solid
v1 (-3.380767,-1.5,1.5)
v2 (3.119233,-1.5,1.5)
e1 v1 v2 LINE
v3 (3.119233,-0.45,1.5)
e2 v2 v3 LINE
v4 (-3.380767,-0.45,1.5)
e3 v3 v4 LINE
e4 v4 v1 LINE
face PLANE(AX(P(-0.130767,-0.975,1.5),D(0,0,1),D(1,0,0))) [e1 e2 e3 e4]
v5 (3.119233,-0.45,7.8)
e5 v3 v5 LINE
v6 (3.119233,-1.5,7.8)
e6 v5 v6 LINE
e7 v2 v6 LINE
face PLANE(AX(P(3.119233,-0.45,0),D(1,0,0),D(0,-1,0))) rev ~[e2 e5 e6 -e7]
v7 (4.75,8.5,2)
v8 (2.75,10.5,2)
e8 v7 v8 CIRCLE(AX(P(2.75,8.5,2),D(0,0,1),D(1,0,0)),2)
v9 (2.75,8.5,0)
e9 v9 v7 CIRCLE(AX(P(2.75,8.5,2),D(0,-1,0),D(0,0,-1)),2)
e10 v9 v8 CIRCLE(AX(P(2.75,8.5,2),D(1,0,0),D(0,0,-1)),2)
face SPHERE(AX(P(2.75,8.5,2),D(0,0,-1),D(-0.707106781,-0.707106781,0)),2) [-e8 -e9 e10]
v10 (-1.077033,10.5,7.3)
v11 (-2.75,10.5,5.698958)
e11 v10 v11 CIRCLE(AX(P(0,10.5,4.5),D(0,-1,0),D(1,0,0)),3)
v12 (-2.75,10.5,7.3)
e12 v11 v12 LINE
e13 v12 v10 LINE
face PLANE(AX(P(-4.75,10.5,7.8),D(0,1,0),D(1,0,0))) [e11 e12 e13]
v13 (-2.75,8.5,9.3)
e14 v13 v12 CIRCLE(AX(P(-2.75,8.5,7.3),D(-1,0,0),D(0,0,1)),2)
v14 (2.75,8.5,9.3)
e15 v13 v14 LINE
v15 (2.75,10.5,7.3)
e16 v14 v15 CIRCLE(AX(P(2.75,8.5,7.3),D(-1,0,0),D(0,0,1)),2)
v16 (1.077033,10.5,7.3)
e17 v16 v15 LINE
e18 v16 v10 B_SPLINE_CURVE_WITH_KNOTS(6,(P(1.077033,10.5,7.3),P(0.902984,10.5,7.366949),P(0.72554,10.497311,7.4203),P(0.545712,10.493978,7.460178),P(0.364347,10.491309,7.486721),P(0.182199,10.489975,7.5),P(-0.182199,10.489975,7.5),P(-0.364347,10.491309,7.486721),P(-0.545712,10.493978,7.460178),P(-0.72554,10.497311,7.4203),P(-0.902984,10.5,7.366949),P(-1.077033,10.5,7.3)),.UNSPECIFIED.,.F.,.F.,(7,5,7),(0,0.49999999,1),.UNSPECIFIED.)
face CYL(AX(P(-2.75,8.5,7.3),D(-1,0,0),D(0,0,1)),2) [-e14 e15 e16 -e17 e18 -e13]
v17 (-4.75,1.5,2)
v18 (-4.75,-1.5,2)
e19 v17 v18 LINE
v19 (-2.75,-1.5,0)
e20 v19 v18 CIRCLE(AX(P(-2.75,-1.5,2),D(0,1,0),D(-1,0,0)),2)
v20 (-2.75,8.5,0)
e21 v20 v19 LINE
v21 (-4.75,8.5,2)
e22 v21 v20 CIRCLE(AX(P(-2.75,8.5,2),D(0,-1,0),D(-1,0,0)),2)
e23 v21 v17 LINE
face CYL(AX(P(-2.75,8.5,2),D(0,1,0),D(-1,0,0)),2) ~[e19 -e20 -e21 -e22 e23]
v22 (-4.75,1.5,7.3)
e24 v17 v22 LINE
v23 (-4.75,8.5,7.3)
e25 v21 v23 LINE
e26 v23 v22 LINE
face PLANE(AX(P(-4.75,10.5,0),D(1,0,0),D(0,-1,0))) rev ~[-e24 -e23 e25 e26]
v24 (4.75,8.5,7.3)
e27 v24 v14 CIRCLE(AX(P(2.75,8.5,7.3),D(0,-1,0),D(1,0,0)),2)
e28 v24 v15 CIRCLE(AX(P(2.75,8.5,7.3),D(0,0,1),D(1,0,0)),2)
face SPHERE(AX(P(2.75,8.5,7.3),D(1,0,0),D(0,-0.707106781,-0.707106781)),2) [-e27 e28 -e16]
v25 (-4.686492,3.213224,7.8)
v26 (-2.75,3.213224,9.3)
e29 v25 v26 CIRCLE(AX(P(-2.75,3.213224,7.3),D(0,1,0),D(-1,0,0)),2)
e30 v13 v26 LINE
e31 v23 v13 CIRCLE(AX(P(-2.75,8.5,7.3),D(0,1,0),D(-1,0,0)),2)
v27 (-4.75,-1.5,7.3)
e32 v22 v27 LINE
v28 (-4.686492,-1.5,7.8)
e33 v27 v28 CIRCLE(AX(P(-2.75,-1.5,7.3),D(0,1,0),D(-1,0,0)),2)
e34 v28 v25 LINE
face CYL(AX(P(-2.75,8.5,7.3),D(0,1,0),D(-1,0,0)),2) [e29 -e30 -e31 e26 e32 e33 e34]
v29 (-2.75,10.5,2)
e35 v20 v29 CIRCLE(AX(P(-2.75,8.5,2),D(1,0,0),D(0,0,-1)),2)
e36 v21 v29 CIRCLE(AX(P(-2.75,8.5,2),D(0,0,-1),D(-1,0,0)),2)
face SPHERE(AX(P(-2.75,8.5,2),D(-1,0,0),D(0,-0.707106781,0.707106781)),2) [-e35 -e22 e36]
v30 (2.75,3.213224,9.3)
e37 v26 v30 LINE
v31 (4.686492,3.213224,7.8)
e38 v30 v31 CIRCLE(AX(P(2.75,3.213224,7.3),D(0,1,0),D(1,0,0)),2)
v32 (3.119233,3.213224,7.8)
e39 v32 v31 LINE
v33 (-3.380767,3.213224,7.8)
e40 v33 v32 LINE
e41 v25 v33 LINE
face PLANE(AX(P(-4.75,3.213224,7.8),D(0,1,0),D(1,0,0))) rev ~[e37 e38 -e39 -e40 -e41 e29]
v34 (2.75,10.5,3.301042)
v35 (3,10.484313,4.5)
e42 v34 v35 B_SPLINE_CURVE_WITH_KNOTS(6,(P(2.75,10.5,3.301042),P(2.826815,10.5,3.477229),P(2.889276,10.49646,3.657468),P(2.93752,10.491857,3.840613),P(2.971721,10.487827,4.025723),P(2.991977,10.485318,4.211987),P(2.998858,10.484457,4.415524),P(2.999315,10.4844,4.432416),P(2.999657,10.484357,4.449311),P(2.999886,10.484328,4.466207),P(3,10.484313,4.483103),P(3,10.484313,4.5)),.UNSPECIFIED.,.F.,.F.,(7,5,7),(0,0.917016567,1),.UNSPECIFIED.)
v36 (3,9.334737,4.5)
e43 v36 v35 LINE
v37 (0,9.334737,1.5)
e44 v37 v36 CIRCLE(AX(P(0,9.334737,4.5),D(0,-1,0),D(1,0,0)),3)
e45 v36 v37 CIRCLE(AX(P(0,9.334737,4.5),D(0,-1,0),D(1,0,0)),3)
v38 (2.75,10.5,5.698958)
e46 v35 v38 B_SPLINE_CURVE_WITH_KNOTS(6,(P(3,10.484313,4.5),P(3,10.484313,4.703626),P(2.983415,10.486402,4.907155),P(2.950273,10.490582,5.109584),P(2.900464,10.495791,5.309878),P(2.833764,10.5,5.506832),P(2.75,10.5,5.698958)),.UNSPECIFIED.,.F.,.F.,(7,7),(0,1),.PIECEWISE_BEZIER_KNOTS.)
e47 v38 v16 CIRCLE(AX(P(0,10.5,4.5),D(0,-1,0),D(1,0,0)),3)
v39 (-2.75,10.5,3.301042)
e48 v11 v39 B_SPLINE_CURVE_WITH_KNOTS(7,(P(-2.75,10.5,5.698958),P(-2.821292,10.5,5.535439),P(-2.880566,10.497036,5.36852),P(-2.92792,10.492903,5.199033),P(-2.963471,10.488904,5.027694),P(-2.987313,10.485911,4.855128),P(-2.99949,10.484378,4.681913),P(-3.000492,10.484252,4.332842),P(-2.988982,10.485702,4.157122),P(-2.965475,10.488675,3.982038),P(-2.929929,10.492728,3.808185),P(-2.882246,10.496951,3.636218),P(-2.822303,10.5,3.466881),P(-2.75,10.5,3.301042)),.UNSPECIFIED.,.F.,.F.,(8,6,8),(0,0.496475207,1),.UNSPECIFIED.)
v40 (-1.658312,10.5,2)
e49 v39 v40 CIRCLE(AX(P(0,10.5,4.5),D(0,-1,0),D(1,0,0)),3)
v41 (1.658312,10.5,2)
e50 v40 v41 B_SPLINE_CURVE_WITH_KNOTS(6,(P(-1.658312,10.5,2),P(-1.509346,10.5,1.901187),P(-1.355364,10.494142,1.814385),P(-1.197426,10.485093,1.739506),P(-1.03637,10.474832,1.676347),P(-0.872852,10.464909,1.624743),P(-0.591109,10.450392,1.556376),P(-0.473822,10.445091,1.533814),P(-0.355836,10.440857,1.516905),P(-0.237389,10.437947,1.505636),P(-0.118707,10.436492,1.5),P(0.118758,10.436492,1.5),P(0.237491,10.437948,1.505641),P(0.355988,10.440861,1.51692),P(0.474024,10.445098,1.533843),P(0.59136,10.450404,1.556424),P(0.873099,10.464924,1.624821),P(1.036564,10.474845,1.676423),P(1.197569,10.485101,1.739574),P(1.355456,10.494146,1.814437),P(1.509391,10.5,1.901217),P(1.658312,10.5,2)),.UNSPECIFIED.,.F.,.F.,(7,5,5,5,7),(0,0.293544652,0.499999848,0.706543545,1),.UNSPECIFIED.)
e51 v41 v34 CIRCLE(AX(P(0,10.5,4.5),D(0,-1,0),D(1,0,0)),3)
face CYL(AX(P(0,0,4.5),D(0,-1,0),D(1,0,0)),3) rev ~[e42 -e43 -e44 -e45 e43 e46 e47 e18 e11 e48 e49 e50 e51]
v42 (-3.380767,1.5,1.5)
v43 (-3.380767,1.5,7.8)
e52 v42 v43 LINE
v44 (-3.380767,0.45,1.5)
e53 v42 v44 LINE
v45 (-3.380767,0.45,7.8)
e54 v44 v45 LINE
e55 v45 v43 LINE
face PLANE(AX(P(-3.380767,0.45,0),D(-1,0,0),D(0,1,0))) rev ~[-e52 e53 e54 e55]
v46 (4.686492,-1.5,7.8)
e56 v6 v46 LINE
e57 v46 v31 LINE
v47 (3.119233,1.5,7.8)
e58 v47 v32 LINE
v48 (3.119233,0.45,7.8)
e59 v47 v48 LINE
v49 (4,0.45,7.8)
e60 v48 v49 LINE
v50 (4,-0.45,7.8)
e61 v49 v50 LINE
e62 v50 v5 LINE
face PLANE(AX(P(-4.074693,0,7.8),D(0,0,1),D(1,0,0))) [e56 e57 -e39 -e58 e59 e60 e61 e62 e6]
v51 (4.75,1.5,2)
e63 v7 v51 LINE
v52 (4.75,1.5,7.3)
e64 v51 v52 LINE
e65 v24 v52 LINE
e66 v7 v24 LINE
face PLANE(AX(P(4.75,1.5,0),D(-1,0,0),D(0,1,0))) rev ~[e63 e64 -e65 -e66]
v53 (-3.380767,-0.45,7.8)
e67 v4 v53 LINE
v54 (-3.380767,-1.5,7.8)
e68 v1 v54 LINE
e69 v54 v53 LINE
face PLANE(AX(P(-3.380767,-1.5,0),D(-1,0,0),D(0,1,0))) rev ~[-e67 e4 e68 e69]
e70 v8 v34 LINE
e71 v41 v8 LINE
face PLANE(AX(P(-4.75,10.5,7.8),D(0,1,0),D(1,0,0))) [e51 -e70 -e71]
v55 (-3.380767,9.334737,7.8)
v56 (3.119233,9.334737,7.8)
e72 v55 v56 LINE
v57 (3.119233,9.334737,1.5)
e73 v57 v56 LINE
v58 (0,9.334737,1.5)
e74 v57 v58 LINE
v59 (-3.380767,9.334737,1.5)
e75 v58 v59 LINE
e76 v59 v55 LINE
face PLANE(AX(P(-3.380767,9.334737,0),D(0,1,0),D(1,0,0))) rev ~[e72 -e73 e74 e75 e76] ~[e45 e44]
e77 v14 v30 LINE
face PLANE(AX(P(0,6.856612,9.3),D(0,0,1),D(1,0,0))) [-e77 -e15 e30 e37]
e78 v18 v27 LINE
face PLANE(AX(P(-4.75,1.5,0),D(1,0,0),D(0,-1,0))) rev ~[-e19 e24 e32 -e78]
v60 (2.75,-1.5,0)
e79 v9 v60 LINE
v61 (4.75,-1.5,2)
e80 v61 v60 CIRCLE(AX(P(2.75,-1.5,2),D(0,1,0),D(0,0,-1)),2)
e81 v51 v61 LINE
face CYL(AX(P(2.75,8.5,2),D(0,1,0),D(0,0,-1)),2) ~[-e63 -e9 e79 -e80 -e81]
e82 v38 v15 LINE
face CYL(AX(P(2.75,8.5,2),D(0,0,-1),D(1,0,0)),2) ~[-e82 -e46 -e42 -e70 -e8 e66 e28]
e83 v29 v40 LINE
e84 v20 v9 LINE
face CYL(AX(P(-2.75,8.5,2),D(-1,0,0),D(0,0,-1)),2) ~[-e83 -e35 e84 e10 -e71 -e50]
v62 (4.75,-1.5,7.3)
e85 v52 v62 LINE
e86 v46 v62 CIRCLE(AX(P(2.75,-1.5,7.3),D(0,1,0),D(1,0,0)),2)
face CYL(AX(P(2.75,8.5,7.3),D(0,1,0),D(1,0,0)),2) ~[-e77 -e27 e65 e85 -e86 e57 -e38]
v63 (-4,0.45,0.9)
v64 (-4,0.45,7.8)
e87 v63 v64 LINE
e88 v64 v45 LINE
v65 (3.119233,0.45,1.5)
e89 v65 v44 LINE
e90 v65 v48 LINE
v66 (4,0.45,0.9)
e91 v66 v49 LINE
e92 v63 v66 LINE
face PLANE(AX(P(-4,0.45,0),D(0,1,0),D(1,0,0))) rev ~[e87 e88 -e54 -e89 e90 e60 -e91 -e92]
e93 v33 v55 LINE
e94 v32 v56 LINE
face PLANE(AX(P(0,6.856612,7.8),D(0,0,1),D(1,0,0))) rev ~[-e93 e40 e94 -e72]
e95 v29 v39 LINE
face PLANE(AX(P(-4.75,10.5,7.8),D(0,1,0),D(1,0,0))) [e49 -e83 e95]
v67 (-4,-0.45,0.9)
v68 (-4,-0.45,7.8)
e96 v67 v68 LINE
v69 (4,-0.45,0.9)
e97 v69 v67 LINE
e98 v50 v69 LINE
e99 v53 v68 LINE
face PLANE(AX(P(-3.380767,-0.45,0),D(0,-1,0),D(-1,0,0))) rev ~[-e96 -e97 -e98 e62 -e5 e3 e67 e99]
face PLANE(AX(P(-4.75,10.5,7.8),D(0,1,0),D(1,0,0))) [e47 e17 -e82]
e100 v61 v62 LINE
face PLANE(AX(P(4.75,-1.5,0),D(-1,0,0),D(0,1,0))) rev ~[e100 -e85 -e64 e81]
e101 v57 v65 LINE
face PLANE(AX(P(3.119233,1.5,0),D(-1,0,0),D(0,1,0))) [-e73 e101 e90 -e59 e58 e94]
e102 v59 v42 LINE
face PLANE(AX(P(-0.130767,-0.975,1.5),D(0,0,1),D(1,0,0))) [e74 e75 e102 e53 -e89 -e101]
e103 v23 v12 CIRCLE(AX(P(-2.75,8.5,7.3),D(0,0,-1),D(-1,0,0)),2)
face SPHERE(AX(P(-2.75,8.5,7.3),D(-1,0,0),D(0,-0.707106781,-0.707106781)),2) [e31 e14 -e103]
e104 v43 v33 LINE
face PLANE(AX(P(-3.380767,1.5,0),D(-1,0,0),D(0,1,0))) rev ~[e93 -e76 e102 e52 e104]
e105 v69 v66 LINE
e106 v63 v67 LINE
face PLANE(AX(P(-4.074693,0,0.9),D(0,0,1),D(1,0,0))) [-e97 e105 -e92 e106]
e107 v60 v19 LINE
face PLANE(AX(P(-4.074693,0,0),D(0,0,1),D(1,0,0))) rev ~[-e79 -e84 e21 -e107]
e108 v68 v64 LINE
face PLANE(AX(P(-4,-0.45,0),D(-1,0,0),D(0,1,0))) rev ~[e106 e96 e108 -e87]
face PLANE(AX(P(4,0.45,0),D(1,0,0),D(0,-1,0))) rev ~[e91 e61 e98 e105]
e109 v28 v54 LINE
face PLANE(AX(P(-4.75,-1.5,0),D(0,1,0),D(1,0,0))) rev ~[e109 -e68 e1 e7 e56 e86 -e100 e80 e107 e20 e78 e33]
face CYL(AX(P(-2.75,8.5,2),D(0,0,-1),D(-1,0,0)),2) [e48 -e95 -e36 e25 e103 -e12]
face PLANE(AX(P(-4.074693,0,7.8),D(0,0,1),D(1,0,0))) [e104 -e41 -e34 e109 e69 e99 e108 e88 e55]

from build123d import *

# Parameters (mm, degrees)
F0_W         = 1.3692331631
F0_H         = 7.834737435
F0_W_2       = 6.5
F0_H_2       = 0.9
F0_W_3       = 0.6192331631
F0_H_3       = 1.05
F0_H_4       = 1.165262565
F0_W_4       = 0.8807668369
F0_W_5       = 1.6307668369
F1_DEPTH     = 0.9
F2_DEPTH     = 1.5
F3_DEPTH     = 7.8
F5_W         = 9.5
F5_H         = 7.2867757659
F6_DEPTH     = 1.5
F7_R         = 3
F8_DEPTH     = 10.501
F9_T1_DEPTH  = 5.3
F9_T3_DEPTH  = 5.5
F9_T5_DEPTH  = 10.2867757659
F9_T7_DEPTH  = 15
F9_S11_W     = 2
F9_S11_H     = 2
F9_T12_DEPTH = 2
F9_S17_W     = 2
F9_S17_H     = 2
F9_T18_DEPTH = 2
F9_S23_W     = 2
F9_S23_H     = 2
F9_T24_DEPTH = 2
F9_S29_W     = 2
F9_S29_H     = 2
F9_T30_DEPTH = 2


# Not quite as in the source:
# - a fillet or chamfer that OpenCascade refuses, or shapes differently, is made with other operations: its cross-section is extruded or revolved along the edge and cut away or added
# - a feature names something its author has since deleted; it is built from what else it names


with BuildPart() as f1:
    # F0 (on Top) → F1 (new body)
    with BuildSketch(Plane.XY):
        Polygon((-4.75, 1.5), (-4.75, -1.5), (-3.3807668369, -1.5), (-3.3807668369, -0.45), (-4, -0.45), (-4, 0.45), (-3.3807668369, 0.45), (-3.3807668369, 1.5), align=None)
        Polygon((-3.3807668369, -0.45), (-3.3807668369, -1.5), (-3.1192331631, -1.5), (3.1192331631, -1.5), (3.1192331631, -0.45), align=None)
        with Locations((-4.0653834185, 5.4173687175)):
            Rectangle(F0_W, F0_H)
        with Locations((-0.1307668369, 0)):
            Rectangle(F0_W_2, F0_H_2)
        with Locations((-3.6903834185, 0)):
            Rectangle(F0_W_3, F0_H_2)
        with Locations((-0.1307668369, 5.4173687175)):
            Rectangle(F0_W_2, F0_H)
        with Locations((-0.1307668369, 0.975)):
            Rectangle(F0_W_2, F0_H_3)
        with Locations((-4.0653834185, 9.9173687175)):
            Rectangle(F0_W, F0_H_4)
        Polygon((3.1192331631, -0.45), (3.1192331631, -1.5), (3.3807668369, -1.5), (4.75, -1.5), (4.75, 1.5), (3.1192331631, 1.5), (3.1192331631, 0.45), (4, 0.45), (4, -0.45), align=None)
        with Locations((3.5596165815, 0)):
            Rectangle(F0_W_4, F0_H_2)
        with Locations((3.9346165815, 5.4173687175)):
            Rectangle(F0_W_5, F0_H)
        with Locations((-0.1307668369, 9.9173687175)):
            Rectangle(F0_W_2, F0_H_4)
        with Locations((3.9346165815, 9.9173687175)):
            Rectangle(F0_W_5, F0_H_4)
    extrude(amount=F1_DEPTH)

    # F0 (on Top) → F2 (join)
    with BuildSketch(Plane.XY):
        Polygon((-3.3807668369, -0.45), (-3.3807668369, -1.5), (-3.1192331631, -1.5), (3.1192331631, -1.5), (3.1192331631, -0.45), align=None)
        Polygon((3.1192331631, -0.45), (3.1192331631, -1.5), (3.3807668369, -1.5), (4.75, -1.5), (4.75, 1.5), (3.1192331631, 1.5), (3.1192331631, 0.45), (4, 0.45), (4, -0.45), align=None)
        Polygon((-4.75, 1.5), (-4.75, -1.5), (-3.3807668369, -1.5), (-3.3807668369, -0.45), (-4, -0.45), (-4, 0.45), (-3.3807668369, 0.45), (-3.3807668369, 1.5), align=None)
        with Locations((-0.1307668369, 0.975)):
            Rectangle(F0_W_2, F0_H_3)
        with Locations((-4.0653834185, 5.4173687175)):
            Rectangle(F0_W, F0_H)
        with Locations((3.9346165815, 5.4173687175)):
            Rectangle(F0_W_5, F0_H)
        with Locations((-0.1307668369, 5.4173687175)):
            Rectangle(F0_W_2, F0_H)
        with Locations((-4.0653834185, 9.9173687175)):
            Rectangle(F0_W, F0_H_4)
        with Locations((-0.1307668369, 9.9173687175)):
            Rectangle(F0_W_2, F0_H_4)
        with Locations((3.9346165815, 9.9173687175)):
            Rectangle(F0_W_5, F0_H_4)
    extrude(amount=F2_DEPTH)

    # F0 (on Top) → F3 (join)
    with BuildSketch(Plane.XY):
        Polygon((-4.75, 1.5), (-4.75, -1.5), (-3.3807668369, -1.5), (-3.3807668369, -0.45), (-4, -0.45), (-4, 0.45), (-3.3807668369, 0.45), (-3.3807668369, 1.5), align=None)
        Polygon((3.1192331631, -0.45), (3.1192331631, -1.5), (3.3807668369, -1.5), (4.75, -1.5), (4.75, 1.5), (3.1192331631, 1.5), (3.1192331631, 0.45), (4, 0.45), (4, -0.45), align=None)
        with Locations((-4.0653834185, 5.4173687175)):
            Rectangle(F0_W, F0_H)
        with Locations((3.9346165815, 5.4173687175)):
            Rectangle(F0_W_5, F0_H)
        with Locations((-4.0653834185, 9.9173687175)):
            Rectangle(F0_W, F0_H_4)
        with Locations((-0.1307668369, 9.9173687175)):
            Rectangle(F0_W_2, F0_H_4)
        with Locations((3.9346165815, 9.9173687175)):
            Rectangle(F0_W_5, F0_H_4)
    extrude(amount=F3_DEPTH)

    # F5 (on offset) → F6 (join)
    with BuildSketch(Plane.XY.offset(7.8)):
        with Locations((0, 6.856612117)):
            Rectangle(F5_W, F5_H)
    extrude(amount=F6_DEPTH)

    # F7 (on Front) → F8 (cut, through all)
    with BuildSketch(Plane.XZ):
        with Locations((0, 4.5)):
            Circle(F7_R)
    extrude(amount=-F8_DEPTH, mode=Mode.SUBTRACT)

    # F9: fillet of radius 2 on 8 edges, made by hand

    # F9_s2 → F9_t1 (cut)
    with BuildSketch(Plane.XY.offset(2)):
        with BuildLine():
            ThreePointArc((4.75, 8.5), (4.1642135624, 9.9142135624), (2.75, 10.5))
            Line((2.75, 10.5), (4.75, 10.5))
            Line((4.75, 10.5), (4.75, 8.5))
        make_face()
        with BuildLine():
            ThreePointArc((-4.75, 8.5), (-4.1642135624, 9.9142135624), (-2.75, 10.5))
            Line((-2.75, 10.5), (-4.75, 10.5))
            Line((-4.75, 10.5), (-4.75, 8.5))
        make_face()
    extrude(amount=F9_T1_DEPTH, mode=Mode.SUBTRACT)

    # F9_s4 → F9_t3 (cut)
    with BuildSketch(Plane.YZ.offset(-2.75)):
        with BuildLine():
            ThreePointArc((8.5, 9.3), (9.9142135624, 8.7142135624), (10.5, 7.3))
            Line((10.5, 7.3), (10.5, 9.3))
            Line((10.5, 9.3), (8.5, 9.3))
        make_face()
        with BuildLine():
            ThreePointArc((8.5, 0), (9.9142135624, 0.5857864376), (10.5, 2))
            Line((10.5, 2), (10.5, 0))
            Line((10.5, 0), (8.5, 0))
        make_face()
    extrude(amount=F9_T3_DEPTH, mode=Mode.SUBTRACT)

    # F9_s6 → F9_t5 (cut)
    with BuildSketch(Plane.XZ.offset(-8.5)):
        with BuildLine():
            ThreePointArc((4.75, 7.3), (4.1642135624, 8.7142135624), (2.75, 9.3))
            Line((2.75, 9.3), (4.75, 9.3))
            Line((4.75, 9.3), (4.75, 7.3))
        make_face()
        with BuildLine():
            ThreePointArc((-4.75, 7.3), (-4.1642135624, 8.7142135624), (-2.75, 9.3))
            Line((-2.75, 9.3), (-4.75, 9.3))
            Line((-4.75, 9.3), (-4.75, 7.3))
        make_face()
    extrude(amount=F9_T5_DEPTH, mode=Mode.SUBTRACT)

    # F9_s8 → F9_t7 (cut)
    with BuildSketch(Plane.XZ.offset(-8.5)):
        with BuildLine():
            ThreePointArc((2.75, 0), (4.1642135624, 0.5857864376), (4.75, 2))
            Line((4.75, 2), (4.75, 0))
            Line((4.75, 0), (2.75, 0))
        make_face()
        with BuildLine():
            ThreePointArc((-4.75, 2), (-4.1642135624, 0.5857864376), (-2.75, 0))
            Line((-2.75, 0), (-4.75, 0))
            Line((-4.75, 0), (-4.75, 2))
        make_face()
    extrude(amount=F9_T7_DEPTH, mode=Mode.SUBTRACT)


with BuildPart() as f9_tool10:
    # F9_s11 → F9_t12 (new body)
    with BuildSketch(Plane.YZ.offset(2.75)):
        with Locations((9.5, 8.3)):
            Rectangle(F9_S11_W, F9_S11_H)
    extrude(amount=F9_T12_DEPTH)

    # F9_s13 → F9_t14 (revolve, cut)
    with BuildSketch(Plane(origin=(2.75, 8.5, 7.3), x_dir=(0, -0.7071067812, -0.7071067812), z_dir=(0, -0.7071067812, 0.7071067812))):
        with BuildLine():
            ThreePointArc((0, -2), (2, 0), (0, 2))
            Line((0, 2), (0, -2))
        make_face()
    revolve(axis=Axis((2.75, 8.5, 7.3), (1, 0, 0)), mode=Mode.SUBTRACT)


with BuildPart() as f1_1:
    add(f1.part)

    # F9_t9: cut F9_tool10
    add(f9_tool10.part, mode=Mode.SUBTRACT)


with BuildPart() as f9_tool16:
    # F9_s17 → F9_t18 (new body)
    with BuildSketch(Plane.XY.offset(2)):
        with Locations((3.75, 9.5)):
            Rectangle(F9_S17_W, F9_S17_H)
    extrude(amount=-F9_T18_DEPTH)

    # F9_s19 → F9_t20 (revolve, cut)
    with BuildSketch(Plane(origin=(2.75, 8.5, 2), x_dir=(-0.7071067812, -0.7071067812, 0), z_dir=(0.7071067812, -0.7071067812, 0))):
        with BuildLine():
            ThreePointArc((0, -2), (2, 0), (0, 2))
            Line((0, 2), (0, -2))
        make_face()
    revolve(axis=Axis((2.75, 8.5, 2), (0, 0, -1)), mode=Mode.SUBTRACT)


with BuildPart() as f1_2:
    add(f1_1.part)

    # F9_t15: cut F9_tool16
    add(f9_tool16.part, mode=Mode.SUBTRACT)


with BuildPart() as f9_tool22:
    # F9_s23 → F9_t24 (new body)
    with BuildSketch(Plane.YZ.offset(-2.75)):
        with Locations((9.5, 8.3)):
            Rectangle(F9_S23_W, F9_S23_H)
    extrude(amount=-F9_T24_DEPTH)

    # F9_s25 → F9_t26 (revolve, cut)
    with BuildSketch(Plane(origin=(-2.75, 8.5, 7.3), x_dir=(0, -0.7071067812, -0.7071067812), z_dir=(0, 0.7071067812, -0.7071067812))):
        with BuildLine():
            ThreePointArc((0, -2), (2, 0), (0, 2))
            Line((0, 2), (0, -2))
        make_face()
    revolve(axis=Axis((-2.75, 8.5, 7.3), (-1, 0, 0)), mode=Mode.SUBTRACT)


with BuildPart() as f1_3:
    add(f1_2.part)

    # F9_t21: cut F9_tool22
    add(f9_tool22.part, mode=Mode.SUBTRACT)


with BuildPart() as f9_tool28:
    # F9_s29 → F9_t30 (new body)
    with BuildSketch(Plane.YZ.offset(-2.75)):
        with Locations((9.5, 1)):
            Rectangle(F9_S29_W, F9_S29_H)
    extrude(amount=-F9_T30_DEPTH)

    # F9_s31 → F9_t32 (revolve, cut)
    with BuildSketch(Plane(origin=(-2.75, 8.5, 2), x_dir=(0, -0.7071067812, 0.7071067812), z_dir=(0, -0.7071067812, -0.7071067812))):
        with BuildLine():
            ThreePointArc((0, -2), (2, 0), (0, 2))
            Line((0, 2), (0, -2))
        make_face()
    revolve(axis=Axis((-2.75, 8.5, 2), (-1, 0, 0)), mode=Mode.SUBTRACT)


with BuildPart() as f1_4:
    add(f1_3.part)

    # F9_t27: cut F9_tool28
    add(f9_tool28.part, mode=Mode.SUBTRACT)


solid = f1_4.part
